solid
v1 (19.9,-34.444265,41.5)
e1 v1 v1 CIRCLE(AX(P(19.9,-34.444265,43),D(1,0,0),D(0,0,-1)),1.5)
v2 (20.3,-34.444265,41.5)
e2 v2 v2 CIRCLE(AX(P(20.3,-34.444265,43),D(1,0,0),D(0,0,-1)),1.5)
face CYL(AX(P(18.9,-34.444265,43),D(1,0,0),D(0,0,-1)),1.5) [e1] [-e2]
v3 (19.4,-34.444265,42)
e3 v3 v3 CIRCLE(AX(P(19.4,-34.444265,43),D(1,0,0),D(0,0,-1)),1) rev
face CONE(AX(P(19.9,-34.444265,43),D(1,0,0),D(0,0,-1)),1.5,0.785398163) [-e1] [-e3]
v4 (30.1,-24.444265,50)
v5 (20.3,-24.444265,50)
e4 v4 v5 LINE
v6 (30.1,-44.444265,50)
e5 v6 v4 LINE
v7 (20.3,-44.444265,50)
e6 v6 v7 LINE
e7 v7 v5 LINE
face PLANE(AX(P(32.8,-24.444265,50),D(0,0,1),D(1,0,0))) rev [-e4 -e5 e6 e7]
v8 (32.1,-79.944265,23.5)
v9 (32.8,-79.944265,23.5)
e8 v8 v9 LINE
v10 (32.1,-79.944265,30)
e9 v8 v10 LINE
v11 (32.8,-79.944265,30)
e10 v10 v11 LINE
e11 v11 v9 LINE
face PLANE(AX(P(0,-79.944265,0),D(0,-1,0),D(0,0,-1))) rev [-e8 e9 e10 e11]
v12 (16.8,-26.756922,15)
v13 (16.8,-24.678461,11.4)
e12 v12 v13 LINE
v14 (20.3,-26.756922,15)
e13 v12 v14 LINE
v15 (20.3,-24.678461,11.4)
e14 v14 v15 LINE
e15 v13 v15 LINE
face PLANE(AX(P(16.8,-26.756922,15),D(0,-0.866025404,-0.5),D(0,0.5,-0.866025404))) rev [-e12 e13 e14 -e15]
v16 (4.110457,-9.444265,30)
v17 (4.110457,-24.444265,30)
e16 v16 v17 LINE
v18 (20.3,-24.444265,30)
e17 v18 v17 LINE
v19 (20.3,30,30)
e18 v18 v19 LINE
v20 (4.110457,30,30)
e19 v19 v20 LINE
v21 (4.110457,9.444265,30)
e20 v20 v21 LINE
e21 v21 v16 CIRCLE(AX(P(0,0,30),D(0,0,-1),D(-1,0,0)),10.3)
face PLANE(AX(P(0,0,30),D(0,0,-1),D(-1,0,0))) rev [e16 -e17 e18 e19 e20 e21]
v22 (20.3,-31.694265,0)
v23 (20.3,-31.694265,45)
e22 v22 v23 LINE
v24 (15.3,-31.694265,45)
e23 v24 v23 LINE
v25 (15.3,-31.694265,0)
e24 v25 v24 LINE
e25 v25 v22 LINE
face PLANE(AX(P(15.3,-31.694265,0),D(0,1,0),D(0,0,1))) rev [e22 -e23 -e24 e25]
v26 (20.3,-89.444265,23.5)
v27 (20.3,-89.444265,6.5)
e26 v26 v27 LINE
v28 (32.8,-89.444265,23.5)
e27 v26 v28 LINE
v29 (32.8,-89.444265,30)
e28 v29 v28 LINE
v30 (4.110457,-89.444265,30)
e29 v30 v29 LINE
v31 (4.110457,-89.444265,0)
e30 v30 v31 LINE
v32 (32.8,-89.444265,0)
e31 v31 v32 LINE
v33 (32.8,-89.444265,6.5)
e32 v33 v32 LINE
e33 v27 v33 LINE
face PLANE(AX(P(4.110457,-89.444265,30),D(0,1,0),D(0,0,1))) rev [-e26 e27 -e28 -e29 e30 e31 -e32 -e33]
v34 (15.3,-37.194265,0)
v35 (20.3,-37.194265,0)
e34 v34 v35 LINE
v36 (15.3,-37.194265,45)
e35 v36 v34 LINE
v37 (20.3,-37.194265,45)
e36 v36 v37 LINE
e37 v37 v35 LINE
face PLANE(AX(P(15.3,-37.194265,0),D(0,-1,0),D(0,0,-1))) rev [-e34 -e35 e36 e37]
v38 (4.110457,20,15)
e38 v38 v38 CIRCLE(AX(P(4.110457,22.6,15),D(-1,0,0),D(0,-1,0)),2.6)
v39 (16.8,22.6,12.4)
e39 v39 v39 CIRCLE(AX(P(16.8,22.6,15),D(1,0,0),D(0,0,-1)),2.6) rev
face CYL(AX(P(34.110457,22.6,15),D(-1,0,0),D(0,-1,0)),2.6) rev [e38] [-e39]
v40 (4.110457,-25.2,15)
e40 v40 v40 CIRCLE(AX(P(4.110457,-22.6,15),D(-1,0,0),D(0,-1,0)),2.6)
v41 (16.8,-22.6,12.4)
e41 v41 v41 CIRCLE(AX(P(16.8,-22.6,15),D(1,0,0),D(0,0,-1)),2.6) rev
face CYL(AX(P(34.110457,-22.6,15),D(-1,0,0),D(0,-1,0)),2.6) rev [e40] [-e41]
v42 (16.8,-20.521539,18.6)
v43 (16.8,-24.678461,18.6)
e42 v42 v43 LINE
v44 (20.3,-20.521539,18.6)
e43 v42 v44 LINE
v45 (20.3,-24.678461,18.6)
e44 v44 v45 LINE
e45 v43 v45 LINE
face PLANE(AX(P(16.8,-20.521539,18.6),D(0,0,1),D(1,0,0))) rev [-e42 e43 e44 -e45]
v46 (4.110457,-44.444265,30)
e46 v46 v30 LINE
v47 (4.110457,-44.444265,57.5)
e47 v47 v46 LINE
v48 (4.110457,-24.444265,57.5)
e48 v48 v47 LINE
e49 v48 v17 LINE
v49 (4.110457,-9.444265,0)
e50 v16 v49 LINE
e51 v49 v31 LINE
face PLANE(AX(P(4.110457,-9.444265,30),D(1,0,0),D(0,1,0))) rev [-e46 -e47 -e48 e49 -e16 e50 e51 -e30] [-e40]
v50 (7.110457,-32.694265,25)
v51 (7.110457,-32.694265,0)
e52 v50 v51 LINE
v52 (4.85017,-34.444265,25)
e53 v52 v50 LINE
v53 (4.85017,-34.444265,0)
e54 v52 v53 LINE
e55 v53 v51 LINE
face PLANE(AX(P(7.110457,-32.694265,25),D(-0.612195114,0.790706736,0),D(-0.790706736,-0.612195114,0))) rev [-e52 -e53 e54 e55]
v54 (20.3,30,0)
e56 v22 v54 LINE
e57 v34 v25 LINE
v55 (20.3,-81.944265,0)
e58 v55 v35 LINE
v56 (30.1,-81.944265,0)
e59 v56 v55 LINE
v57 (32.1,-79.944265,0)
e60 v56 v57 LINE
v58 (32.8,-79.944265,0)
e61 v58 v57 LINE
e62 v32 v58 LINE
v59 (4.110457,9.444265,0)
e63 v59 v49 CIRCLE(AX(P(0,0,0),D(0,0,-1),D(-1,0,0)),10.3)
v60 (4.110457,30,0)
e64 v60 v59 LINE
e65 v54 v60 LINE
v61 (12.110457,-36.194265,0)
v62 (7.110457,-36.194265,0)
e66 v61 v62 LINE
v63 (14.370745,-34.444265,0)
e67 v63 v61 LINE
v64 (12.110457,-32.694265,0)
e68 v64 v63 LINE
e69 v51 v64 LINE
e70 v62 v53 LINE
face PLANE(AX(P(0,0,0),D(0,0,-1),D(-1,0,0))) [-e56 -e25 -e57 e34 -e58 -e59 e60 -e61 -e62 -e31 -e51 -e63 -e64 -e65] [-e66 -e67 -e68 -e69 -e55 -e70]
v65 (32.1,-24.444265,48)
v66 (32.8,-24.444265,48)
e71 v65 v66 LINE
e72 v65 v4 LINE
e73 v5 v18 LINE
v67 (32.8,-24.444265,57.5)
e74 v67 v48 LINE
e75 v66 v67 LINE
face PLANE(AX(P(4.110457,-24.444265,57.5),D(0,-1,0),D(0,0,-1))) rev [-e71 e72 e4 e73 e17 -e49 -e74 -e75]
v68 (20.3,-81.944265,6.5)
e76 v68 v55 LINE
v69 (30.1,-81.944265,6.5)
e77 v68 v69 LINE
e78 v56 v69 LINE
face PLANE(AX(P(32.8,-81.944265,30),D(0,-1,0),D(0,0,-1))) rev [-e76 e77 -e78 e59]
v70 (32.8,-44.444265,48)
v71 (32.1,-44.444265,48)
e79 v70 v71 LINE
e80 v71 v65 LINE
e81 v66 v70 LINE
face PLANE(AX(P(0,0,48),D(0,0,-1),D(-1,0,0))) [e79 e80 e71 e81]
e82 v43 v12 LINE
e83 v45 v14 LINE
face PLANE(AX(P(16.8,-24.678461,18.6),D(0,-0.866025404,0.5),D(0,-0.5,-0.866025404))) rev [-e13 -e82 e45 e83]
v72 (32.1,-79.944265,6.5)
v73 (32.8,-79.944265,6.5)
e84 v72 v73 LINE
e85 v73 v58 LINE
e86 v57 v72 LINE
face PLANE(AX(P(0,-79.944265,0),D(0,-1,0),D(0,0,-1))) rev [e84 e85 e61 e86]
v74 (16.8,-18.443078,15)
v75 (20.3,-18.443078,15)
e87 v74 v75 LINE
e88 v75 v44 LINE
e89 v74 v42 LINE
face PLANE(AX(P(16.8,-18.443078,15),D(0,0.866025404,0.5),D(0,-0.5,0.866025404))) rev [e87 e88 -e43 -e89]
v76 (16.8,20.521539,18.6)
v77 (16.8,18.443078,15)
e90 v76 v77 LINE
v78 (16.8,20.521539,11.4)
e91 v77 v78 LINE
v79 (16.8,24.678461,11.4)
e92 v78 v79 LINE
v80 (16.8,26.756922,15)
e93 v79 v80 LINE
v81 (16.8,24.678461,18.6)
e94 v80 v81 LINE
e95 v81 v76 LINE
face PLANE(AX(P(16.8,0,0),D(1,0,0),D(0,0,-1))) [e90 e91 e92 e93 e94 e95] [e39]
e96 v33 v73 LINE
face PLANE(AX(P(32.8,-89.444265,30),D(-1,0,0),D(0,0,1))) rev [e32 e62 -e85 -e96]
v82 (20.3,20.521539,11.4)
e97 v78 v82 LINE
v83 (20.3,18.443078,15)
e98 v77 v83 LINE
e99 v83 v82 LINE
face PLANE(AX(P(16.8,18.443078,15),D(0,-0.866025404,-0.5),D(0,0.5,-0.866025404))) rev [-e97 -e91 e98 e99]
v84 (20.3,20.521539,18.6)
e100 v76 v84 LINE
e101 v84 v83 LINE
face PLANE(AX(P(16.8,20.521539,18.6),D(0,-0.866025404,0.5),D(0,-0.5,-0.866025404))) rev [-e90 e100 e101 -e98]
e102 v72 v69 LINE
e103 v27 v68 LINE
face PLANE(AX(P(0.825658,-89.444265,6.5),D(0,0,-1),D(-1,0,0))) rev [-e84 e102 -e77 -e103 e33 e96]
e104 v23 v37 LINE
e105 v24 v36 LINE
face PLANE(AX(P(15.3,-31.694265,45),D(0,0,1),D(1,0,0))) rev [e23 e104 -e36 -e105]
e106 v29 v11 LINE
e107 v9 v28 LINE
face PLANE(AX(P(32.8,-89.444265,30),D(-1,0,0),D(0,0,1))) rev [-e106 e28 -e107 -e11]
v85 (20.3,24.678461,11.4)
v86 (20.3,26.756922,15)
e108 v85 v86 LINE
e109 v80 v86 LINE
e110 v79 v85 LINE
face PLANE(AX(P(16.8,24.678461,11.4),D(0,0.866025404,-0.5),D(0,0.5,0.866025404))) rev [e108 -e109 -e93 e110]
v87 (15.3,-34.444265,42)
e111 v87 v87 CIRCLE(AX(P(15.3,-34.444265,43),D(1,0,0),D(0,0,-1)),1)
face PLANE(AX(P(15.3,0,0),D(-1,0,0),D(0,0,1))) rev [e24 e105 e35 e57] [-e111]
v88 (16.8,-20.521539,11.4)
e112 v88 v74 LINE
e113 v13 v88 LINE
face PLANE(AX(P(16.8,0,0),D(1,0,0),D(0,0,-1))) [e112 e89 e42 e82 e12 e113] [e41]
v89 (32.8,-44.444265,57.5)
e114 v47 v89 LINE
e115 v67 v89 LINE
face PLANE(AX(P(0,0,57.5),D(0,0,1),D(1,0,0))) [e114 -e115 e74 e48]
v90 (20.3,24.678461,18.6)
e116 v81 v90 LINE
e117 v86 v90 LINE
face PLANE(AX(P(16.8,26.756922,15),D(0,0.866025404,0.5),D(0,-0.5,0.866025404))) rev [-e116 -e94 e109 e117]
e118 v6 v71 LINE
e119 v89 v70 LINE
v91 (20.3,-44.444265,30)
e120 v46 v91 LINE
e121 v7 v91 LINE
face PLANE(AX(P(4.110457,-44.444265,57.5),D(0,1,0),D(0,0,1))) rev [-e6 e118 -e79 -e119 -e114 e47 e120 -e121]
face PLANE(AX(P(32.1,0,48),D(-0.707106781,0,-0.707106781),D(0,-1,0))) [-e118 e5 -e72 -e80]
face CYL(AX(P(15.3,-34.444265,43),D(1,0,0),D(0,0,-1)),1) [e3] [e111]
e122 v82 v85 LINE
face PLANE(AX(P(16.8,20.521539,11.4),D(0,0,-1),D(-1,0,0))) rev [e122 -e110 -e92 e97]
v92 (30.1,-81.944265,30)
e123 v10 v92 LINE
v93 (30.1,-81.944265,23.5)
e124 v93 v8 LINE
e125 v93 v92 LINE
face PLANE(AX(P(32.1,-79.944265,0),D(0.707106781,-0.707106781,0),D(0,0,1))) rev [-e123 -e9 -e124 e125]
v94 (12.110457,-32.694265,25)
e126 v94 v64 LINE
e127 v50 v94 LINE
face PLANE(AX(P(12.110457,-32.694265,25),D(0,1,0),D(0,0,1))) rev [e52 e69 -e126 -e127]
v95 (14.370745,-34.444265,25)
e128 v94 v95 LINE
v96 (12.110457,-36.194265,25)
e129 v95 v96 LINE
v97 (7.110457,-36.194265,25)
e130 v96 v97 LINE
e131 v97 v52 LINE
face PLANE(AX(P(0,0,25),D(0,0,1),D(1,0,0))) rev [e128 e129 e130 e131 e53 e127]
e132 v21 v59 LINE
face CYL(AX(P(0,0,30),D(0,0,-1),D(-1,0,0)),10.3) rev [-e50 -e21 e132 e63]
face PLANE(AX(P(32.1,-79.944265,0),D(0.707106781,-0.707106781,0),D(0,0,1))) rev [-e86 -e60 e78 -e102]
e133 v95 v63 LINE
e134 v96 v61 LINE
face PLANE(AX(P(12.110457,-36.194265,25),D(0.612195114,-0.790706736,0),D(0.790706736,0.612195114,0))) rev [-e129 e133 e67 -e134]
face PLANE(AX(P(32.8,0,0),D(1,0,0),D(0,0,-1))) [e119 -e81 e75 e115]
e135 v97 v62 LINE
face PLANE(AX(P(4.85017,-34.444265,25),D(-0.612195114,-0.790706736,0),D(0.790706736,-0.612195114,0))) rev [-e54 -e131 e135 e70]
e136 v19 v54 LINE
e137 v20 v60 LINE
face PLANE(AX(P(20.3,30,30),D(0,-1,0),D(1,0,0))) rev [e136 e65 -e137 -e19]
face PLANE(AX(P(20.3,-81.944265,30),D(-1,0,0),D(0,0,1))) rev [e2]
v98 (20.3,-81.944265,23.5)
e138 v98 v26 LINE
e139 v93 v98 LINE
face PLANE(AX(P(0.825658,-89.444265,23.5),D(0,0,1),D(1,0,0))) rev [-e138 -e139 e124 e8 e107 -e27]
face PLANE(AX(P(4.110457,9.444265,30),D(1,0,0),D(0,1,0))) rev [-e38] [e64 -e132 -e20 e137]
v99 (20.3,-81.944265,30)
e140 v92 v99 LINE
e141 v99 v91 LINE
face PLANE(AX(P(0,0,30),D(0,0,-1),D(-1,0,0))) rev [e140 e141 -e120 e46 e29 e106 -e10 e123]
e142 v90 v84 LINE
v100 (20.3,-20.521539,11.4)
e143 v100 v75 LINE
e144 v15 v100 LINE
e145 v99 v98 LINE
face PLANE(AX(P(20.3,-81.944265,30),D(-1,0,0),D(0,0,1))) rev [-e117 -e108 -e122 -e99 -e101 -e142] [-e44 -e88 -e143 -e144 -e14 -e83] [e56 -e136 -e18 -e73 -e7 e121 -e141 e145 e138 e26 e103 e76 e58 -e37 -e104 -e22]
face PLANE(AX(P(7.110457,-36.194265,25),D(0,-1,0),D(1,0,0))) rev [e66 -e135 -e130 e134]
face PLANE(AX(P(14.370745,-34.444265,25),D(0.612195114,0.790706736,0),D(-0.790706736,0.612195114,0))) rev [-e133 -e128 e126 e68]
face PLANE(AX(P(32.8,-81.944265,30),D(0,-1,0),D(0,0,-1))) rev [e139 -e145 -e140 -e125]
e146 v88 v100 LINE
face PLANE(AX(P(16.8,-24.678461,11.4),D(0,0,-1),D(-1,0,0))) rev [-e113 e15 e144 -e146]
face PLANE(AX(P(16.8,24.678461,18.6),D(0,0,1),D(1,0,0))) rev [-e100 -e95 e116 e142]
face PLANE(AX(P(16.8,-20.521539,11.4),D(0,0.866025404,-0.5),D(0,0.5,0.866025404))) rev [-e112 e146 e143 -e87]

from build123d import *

# Parameters (mm, degrees)
BOSS_EXTRU_1_DEPTH      = 30
ESQUISSE3_R             = 2.6
ENL_V_MAT_EXTRU_1_DEPTH = 30
ENL_V_MAT_EXTRU_2_DEPTH = 3.5
ESQUISSE6_W             = 16.189542707
ESQUISSE6_H             = 20
BOSS_EXTRU_2_DEPTH      = 27.5
ESQUISSE7_W             = 7.5
ESQUISSE7_H             = 20
BOSS_EXTRU_3_DEPTH      = 12.5
ESQUISSE9_W             = 45
ESQUISSE9_H             = 5.5
ESQUISSE9_R             = 1
ENL_V_MAT_EXTRU_4_DEPTH = 5
ESQUISSE10_R            = 1.5
BOSS_EXTRU_4_DEPTH      = 1.4
CHANFREIN1_SIZE         = 1
ENL_V_MAT_EXTRU_5_DEPTH = 25
ESQUISSE12_W            = 2.7
ESQUISSE12_H            = 20
BOSS_EXTRU_5_DEPTH      = 2
CHANFREIN2_SIZE         = 2
ESQUISSE13_W            = 2.7
ESQUISSE13_H            = 30
BOSS_EXTRU_6_DEPTH      = 2
CHANFREIN3_SIZE         = 2
ENL_V_START             = -12.5
ESQUISSE15_W            = 17
ESQUISSE15_H            = 9.5
ENL_V_MAT_EXTRU_6_DEPTH = 12.5


# Some blends are built 0.0001 mm under size
with BuildPart() as part:
    # Esquisse1 → Boss.-Extru.1 (new body)
    with BuildSketch(Plane.XY):
        with BuildLine():
            Line((4.110457293, 9.444264971), (4.110457293, 30))
            Line((4.110457293, 30), (20.3, 30))
            Line((20.3, 30), (20.3, -81.944264971))
            Line((20.3, -81.944264971), (32.8, -81.944264971))
            Line((32.8, -81.944264971), (32.8, -89.444264971))
            Line((32.8, -89.444264971), (4.110457293, -89.444264971))
            Line((4.110457293, -89.444264971), (4.110457293, -9.444264971))
            ThreePointArc((4.110457293, -9.444264971), (10.3, 0), (4.110457293, 9.444264971))
        make_face()
    extrude(amount=BOSS_EXTRU_1_DEPTH)

    # Esquisse3 → Enlèv. mat.-Extru.1 (cut)
    with BuildSketch(Plane.ZY.offset(-4.110457293)):
        with Locations(Location((15, 22.6, 0), (0, 0, 270))):
            Circle(ESQUISSE3_R)
        with Locations(Location((15, -22.6, 0), (0, 0, 270))):
            Circle(ESQUISSE3_R)
    extrude(amount=-ENL_V_MAT_EXTRU_1_DEPTH, mode=Mode.SUBTRACT)

    # Esquisse4 → Enlèv. mat.-Extru.2 (cut)
    with BuildSketch(Plane(origin=(20.3, 0, 0), x_dir=(0, 0, -1), z_dir=(1, 0, 0))):
        Polygon((-15, -18.443078062), (-18.6, -20.521539031), (-18.6, -24.678460969), (-15, -26.756921938), (-11.4, -24.678460969), (-11.4, -20.521539031), align=None)
        Polygon((-15, 26.756921938), (-18.6, 24.678460969), (-18.6, 20.521539031), (-15, 18.443078062), (-11.4, 20.521539031), (-11.4, 24.678460969), align=None)
    extrude(amount=-ENL_V_MAT_EXTRU_2_DEPTH, mode=Mode.SUBTRACT)

    # Esquisse6 → Boss.-Extru.2 (add)
    with BuildSketch(Plane.XY.offset(30)):
        with Locations((12.205228647, -34.444264971)):
            Rectangle(ESQUISSE6_W, ESQUISSE6_H)
    extrude(amount=BOSS_EXTRU_2_DEPTH)

    # Esquisse7 → Boss.-Extru.3 (add)
    with BuildSketch(Plane(origin=(20.3, 0, 0), x_dir=(0, 0, -1), z_dir=(1, 0, 0))):
        with Locations((-53.75, -34.444264971)):
            Rectangle(ESQUISSE7_W, ESQUISSE7_H)
    extrude(amount=BOSS_EXTRU_3_DEPTH)

    # Esquisse9 → Enlèv. mat.-Extru.4 (cut)
    with BuildSketch(Plane(origin=(20.3, 0, 0), x_dir=(0, 0, -1), z_dir=(1, 0, 0))):
        with Locations((-22.5, -34.444264971)):
            Rectangle(ESQUISSE9_W, ESQUISSE9_H)
        with Locations((-43, -34.444264971)):
            Circle(ESQUISSE9_R, mode=Mode.SUBTRACT)
    extrude(amount=-ENL_V_MAT_EXTRU_4_DEPTH, mode=Mode.SUBTRACT)

    # Esquisse10 → Boss.-Extru.4 (add)
    with BuildSketch(Plane(origin=(20.3, 0, 0), x_dir=(0, 0, -1), z_dir=(1, 0, 0))):
        with Locations((-43, -34.444264971)):
            Circle(ESQUISSE10_R)
    extrude(amount=-BOSS_EXTRU_4_DEPTH)

    # Chanfrein1
    # the kernel refuses this chamfer: 1 mm, written as the material it takes off along each edge
    with BuildSketch(Plane(origin=(18.9, -34.444264971, 43), x_dir=(0, 0, -1), z_dir=(0, -1, 0))) as chanfrein1_piece_1_section:
        Polygon((1.5 - CHANFREIN1_SIZE, 0), (1.5, CHANFREIN1_SIZE), (1.5, 0), align=None)
    chanfrein1_piece_1 = revolve(axis=Axis((18.9, -34.444264971, 43), (1, 0, 0)), mode=Mode.PRIVATE)
    chanfrein1_piece_1 = chanfrein1_piece_1 - Plane(origin=(19.653593842, -34.444264971, 43), x_dir=(0, 0, -1), z_dir=(1, 0, 0)) * Cylinder(1, 7, mode=Mode.PRIVATE)
    add(chanfrein1_piece_1, mode=Mode.SUBTRACT)

    # Esquisse11 → Enlèv. mat.-Extru.5 (cut)
    with BuildSketch(Plane(origin=(0, 0, 0), x_dir=(-1, 0, 0), z_dir=(0, 0, -1))):
        Polygon((-12.110457293, -32.694264971), (-7.110457293, -32.694264971), (-4.850170078, -34.444264971), (-7.110457293, -36.194264971), (-12.110457293, -36.194264971), (-14.370744508, -34.444264971), align=None)
    extrude(amount=-ENL_V_MAT_EXTRU_5_DEPTH, mode=Mode.SUBTRACT)

    # Esquisse12 → Boss.-Extru.5 (add)
    with BuildSketch(Plane(origin=(0, 0, 50), x_dir=(-1, 0, 0), z_dir=(0, 0, -1))):
        with Locations((-31.45, -34.444264971)):
            Rectangle(ESQUISSE12_W, ESQUISSE12_H)
    extrude(amount=BOSS_EXTRU_5_DEPTH)

    # Chanfrein2
    chanfrein2_edges = [part.edges().sort_by_distance(p)[0] for p in [
        (30.1, -34.444264971, 48),
    ]]
    chamfer(chanfrein2_edges, length=CHANFREIN2_SIZE - 0.0001)  # a hair under: the kernel refuses the full size

    # Esquisse13 → Boss.-Extru.6 (add)
    with BuildSketch(Plane(origin=(0, -81.944264971, 0), x_dir=(1, 0, 0), z_dir=(0, 1, 0))):
        with Locations((31.45, -15)):
            Rectangle(ESQUISSE13_W, ESQUISSE13_H)
    extrude(amount=BOSS_EXTRU_6_DEPTH)

    # Chanfrein3
    chanfrein3_edges = [part.edges().sort_by_distance(p)[0] for p in [
        (30.1, -79.944264971, 15),
    ]]
    chamfer(chanfrein3_edges, length=CHANFREIN3_SIZE - 0.0001)  # a hair under: the kernel refuses the full size

    # Esquisse15 → Enlèv. mat.-Extru.6 (cut)
    with BuildSketch(Plane(origin=(32.8, 0, 0), x_dir=(0, 0, -1), z_dir=(1, 0, 0)).offset(ENL_V_START)):
        with Locations((-15, -84.694264971)):
            Rectangle(ESQUISSE15_W, ESQUISSE15_H)
    extrude(amount=ENL_V_MAT_EXTRU_6_DEPTH, mode=Mode.SUBTRACT)


solid = part.part
